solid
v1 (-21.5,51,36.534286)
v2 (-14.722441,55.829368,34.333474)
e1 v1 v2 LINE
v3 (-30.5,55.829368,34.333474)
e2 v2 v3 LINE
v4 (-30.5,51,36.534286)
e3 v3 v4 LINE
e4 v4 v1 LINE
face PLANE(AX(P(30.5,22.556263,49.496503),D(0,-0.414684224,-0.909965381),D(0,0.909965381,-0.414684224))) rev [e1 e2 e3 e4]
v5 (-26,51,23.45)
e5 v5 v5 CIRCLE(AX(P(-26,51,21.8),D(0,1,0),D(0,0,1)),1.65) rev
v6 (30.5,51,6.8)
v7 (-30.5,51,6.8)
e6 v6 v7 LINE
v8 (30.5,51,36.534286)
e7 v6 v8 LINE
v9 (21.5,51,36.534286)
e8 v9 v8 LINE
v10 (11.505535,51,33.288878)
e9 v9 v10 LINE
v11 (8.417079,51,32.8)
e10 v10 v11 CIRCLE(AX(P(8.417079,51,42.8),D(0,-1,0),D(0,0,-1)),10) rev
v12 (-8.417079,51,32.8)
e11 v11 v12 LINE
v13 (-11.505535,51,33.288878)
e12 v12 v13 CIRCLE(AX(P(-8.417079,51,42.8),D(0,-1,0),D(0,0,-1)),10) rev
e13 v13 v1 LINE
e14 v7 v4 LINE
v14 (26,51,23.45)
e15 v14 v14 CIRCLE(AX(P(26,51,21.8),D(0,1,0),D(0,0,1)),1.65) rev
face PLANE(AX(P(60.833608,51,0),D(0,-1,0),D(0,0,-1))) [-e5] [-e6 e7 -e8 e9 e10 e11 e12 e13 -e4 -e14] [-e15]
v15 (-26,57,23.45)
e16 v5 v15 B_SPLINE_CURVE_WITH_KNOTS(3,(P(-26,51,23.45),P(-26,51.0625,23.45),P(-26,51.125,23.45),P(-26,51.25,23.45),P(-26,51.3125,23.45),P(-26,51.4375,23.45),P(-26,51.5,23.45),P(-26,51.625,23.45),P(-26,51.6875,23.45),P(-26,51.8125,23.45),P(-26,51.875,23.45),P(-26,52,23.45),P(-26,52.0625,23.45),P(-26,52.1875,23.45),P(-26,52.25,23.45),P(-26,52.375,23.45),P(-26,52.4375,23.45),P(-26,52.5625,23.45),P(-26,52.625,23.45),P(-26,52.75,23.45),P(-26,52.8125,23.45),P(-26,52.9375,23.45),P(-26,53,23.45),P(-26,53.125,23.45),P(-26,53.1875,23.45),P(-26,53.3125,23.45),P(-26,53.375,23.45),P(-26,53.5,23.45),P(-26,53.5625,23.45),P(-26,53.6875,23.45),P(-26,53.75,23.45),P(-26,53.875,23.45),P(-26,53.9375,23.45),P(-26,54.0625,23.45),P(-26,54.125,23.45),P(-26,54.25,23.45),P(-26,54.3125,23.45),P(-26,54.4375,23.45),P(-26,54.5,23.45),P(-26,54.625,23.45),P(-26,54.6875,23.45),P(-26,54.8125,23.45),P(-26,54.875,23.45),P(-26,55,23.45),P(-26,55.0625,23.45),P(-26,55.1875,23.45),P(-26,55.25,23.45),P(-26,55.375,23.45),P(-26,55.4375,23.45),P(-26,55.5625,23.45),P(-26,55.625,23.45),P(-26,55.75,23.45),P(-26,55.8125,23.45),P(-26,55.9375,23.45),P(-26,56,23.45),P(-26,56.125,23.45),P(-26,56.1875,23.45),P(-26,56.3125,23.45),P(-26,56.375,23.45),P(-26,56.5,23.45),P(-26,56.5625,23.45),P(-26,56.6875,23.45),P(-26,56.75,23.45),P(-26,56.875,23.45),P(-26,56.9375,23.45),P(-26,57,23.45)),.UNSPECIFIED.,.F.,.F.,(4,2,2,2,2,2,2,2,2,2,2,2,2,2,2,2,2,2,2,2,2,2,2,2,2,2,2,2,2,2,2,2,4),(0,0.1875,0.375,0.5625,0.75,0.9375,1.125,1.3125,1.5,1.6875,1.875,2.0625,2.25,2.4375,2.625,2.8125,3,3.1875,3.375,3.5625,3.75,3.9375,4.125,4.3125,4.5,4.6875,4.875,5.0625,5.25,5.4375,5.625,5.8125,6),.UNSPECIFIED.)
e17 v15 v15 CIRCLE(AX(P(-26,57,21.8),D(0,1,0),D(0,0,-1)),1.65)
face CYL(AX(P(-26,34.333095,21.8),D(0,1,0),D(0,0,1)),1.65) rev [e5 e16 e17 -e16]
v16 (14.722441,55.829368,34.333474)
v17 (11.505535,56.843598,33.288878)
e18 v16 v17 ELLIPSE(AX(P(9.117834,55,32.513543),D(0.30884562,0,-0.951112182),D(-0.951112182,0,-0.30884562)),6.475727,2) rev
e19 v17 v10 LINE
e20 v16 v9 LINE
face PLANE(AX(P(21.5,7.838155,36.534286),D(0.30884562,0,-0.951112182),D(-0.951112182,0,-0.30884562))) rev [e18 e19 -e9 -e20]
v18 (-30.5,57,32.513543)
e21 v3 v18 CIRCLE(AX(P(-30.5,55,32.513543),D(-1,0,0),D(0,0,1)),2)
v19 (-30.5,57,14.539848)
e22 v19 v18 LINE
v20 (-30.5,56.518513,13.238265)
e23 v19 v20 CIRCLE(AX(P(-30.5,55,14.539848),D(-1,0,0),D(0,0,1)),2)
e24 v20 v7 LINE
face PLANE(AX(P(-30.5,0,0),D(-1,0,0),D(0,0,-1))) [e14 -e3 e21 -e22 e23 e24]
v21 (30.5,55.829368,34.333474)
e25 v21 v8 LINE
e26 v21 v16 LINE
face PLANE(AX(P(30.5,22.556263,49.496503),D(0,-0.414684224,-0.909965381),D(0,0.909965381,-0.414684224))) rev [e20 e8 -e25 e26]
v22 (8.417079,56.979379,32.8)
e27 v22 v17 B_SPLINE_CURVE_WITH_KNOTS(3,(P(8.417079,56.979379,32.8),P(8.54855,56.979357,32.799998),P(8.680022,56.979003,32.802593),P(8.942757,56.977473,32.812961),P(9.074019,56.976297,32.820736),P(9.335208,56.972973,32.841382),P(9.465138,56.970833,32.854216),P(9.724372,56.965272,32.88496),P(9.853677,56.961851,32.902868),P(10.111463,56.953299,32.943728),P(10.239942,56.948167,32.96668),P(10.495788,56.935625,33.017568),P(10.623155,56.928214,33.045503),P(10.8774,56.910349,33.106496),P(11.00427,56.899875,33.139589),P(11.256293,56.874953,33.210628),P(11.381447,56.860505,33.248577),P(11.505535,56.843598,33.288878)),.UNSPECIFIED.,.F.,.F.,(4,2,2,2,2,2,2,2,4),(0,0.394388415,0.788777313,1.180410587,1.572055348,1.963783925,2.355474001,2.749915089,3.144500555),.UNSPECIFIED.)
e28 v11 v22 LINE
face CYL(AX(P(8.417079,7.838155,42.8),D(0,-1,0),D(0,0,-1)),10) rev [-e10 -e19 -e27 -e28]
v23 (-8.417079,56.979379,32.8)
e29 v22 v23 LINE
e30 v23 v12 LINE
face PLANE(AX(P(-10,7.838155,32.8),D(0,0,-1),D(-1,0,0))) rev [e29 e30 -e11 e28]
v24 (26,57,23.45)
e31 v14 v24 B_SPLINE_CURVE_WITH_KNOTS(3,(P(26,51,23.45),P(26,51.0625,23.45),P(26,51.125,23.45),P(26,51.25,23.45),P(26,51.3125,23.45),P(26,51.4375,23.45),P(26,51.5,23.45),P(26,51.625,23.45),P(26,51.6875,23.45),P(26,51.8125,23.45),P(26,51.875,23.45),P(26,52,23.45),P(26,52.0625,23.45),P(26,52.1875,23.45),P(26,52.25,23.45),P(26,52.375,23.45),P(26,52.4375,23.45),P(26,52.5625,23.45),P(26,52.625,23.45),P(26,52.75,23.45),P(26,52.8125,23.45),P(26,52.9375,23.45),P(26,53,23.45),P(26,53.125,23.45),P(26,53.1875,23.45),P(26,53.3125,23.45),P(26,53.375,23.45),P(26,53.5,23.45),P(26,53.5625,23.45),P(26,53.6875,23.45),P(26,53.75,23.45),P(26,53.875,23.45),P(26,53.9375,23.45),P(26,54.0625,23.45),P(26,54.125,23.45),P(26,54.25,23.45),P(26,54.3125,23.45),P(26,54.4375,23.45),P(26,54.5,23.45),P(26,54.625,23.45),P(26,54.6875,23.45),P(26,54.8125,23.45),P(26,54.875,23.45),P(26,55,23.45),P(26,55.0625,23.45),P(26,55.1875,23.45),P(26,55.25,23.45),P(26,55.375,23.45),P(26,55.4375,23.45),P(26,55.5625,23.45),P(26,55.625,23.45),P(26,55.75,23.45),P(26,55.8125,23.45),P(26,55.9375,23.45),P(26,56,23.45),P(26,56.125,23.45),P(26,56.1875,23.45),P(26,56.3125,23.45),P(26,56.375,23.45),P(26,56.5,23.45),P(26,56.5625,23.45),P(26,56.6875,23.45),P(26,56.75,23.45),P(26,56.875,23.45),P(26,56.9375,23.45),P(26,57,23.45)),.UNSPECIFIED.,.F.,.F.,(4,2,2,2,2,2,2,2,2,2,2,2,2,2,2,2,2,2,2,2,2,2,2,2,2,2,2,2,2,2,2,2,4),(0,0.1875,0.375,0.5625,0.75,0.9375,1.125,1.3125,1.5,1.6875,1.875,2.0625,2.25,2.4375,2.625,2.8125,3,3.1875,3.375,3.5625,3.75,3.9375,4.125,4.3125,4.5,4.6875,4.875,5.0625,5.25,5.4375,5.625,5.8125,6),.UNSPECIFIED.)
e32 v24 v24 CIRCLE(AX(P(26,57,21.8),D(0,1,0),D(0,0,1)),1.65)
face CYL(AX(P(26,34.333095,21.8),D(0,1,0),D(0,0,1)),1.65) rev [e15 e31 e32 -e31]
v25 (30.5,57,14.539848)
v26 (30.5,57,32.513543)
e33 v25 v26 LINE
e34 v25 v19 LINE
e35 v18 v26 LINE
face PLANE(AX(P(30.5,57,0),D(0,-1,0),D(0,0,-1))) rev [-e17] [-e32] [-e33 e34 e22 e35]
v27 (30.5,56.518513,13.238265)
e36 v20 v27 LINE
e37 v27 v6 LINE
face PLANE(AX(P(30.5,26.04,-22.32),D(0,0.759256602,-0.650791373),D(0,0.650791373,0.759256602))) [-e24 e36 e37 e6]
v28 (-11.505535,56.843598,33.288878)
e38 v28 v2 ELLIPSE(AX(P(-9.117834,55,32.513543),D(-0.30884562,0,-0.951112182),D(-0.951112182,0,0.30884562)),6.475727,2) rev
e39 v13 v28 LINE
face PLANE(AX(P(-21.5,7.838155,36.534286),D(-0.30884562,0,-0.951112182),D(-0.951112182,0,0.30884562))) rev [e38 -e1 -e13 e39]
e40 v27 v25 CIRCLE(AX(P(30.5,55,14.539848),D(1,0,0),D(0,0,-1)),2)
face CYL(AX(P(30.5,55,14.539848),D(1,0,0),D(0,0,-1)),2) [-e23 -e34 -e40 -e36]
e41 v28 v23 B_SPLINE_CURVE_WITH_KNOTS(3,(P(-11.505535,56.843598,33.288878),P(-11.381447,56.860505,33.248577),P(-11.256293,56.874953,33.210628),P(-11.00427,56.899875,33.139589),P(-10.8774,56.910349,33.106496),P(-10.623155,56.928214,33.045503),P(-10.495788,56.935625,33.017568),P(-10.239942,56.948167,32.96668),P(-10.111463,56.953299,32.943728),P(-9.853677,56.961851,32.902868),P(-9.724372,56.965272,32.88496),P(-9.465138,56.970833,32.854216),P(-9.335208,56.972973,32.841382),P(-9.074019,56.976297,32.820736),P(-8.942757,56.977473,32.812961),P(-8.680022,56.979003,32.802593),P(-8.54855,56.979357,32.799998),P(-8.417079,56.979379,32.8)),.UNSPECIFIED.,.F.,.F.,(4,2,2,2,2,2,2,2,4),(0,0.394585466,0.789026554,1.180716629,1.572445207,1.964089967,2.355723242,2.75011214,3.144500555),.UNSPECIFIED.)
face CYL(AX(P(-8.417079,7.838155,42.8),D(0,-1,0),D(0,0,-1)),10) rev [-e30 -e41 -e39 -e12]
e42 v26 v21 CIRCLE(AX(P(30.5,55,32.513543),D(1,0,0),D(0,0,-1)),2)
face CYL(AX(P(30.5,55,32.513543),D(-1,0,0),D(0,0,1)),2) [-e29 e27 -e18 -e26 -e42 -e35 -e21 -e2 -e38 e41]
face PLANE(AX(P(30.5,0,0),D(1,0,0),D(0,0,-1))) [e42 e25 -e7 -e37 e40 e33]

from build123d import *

# Parameters (mm, degrees)
SKETCH1_R                      = 10.999999999999991
SKETCH1_R_2                    = 1.5500000000000034
SKETCH1_R_3                    = 1.5500000000000018
SKETCH1_R_4                    = 1.5499999999999992
SKETCH1_R_5                    = 1.5500000000000012
BOSS_EXTRUDE1_DEPTH            = 2.8
SKETCH2_R                      = 1.5499999999999992
SKETCH2_R_2                    = 1.5500000000000005
SKETCH2_R_3                    = 1.5500000000000034
SKETCH2_R_4                    = 1.5500000000000018
BOSS_EXTRUDE2_DEPTH            = 8
SKETCH3_R                      = 2.75
SKETCH3_R_2                    = 2.749999999999998
SKETCH3_R_3                    = 2.7500000000000044
SKETCH3_R_4                    = 2.7500000000000036
CUT_EXTRUDE1_DEPTH             = 3.6
SKETCH4_W                      = 13.999999999999996
SKETCH4_H                      = 24
BOSS_EXTRUDE3_DEPTH            = 9
CUT_EXTRUDE3_DEPTH             = 92.05990830217213
CHAMFER1_SIZE                  = 2.4
BOSS_EXTRUDE4_START            = -21.5
BOSS_EXTRUDE4_DEPTH            = 43
SKETCH5_R                      = 1.6499999999999986
SKETCH5_R_2                    = 1.6500000000000061
CUT_EXTRUDE2_DEPTH             = 18
CUT_EXTRUDE4_DEPTH             = 2.8
CHAMFER2_SIZE                  = 1
CHAMFER3_SIZE                  = 1
FILLET1_R                      = 2
CHAMFER4_SIZE                  = 2
CHAMFER5_SIZE                  = 0.4
CHAMFER6_SIZE                  = 0.4
CUT_EXTRUDE6_REACH             = 93.06
CUT_EXTRUDE6_DIRECTION_2_DEPTH = 92.05990830217215
CUT_EXTRUDE5_DEPTH             = 92.05990830217213
CUT_EXTRUDE5_DEPTH_BACK        = 92.05990830217213
FILLET2_R                      = 10


# Read off the part's stored shape, not the designer's step: Mirror1
with BuildPart() as part:
    # Sketch1 → Boss-Extrude1 (new body)
    with BuildSketch(Plane.XY):
        Polygon((-21.499999999999996, 51), (21.499999999999996, 51), (21.5, 8), (-21.5, 8), align=None)
        with Locations((0, 29.5)):
            Circle(SKETCH1_R, mode=Mode.SUBTRACT)
        with Locations((-15.5, 45)):
            Circle(SKETCH1_R_2, mode=Mode.SUBTRACT)
        with Locations((15.5, 45)):
            Circle(SKETCH1_R_3, mode=Mode.SUBTRACT)
        with Locations((-15.5, 14.000000000000005)):
            Circle(SKETCH1_R_4, mode=Mode.SUBTRACT)
        with Locations((15.5, 14.000000000000005)):
            Circle(SKETCH1_R_5, mode=Mode.SUBTRACT)
    extrude(amount=BOSS_EXTRUDE1_DEPTH)

    # Sketch2 → Boss-Extrude2 (add)
    with BuildSketch(Plane(origin=(0, 0, 0), x_dir=(1, 0, 0), z_dir=(0, 1, 0))):
        with BuildLine():
            Line((-21.5, 0), (21.5, 0))
            Line((21.5, 0), (21.5, -56.13000000000001))
            Line((21.5, -56.13000000000001), (12.052422437019597, -62.83770289976113))
            ThreePointArc((12.052422437019597, -62.83770289976113), (10.126743955166411, -63.79910489864743), (8.000000000000245, -64.12999999999994))
            Line((8.000000000000245, -64.12999999999994), (-7.999999999999807, -64.13))
            ThreePointArc((-7.999999999999807, -64.13), (-10.126743955165974, -63.7991048986475), (-12.052422437019167, -62.83770289976122))
            Line((-12.052422437019167, -62.83770289976122), (-21.49999999999961, -56.13000000000015))
            Line((-21.49999999999961, -56.13000000000015), (-21.5, 0))
        make_face()
        with Locations(Location((8.00000000000003, -8.800000000000002, 0), (0, 0, 270))):
            Circle(SKETCH2_R, mode=Mode.SUBTRACT)
        with Locations(Location((-7.999999999999971, -8.800000000000054, 0), (0, 0, 270))):
            Circle(SKETCH2_R_2, mode=Mode.SUBTRACT)
        with Locations(Location((-7.999999999999804, -57.13000000000005, 0), (0, 0, 270))):
            Circle(SKETCH2_R_3, mode=Mode.SUBTRACT)
        with Locations(Location((8.000000000000195, -57.13, 0), (0, 0, 270))):
            Circle(SKETCH2_R_4, mode=Mode.SUBTRACT)
        with BuildLine():
            Line((15.912505911952584, -21.89324240011998), (3.312505911952694, -31.19069648889579))
            ThreePointArc((3.312505911952694, -31.19069648889579), (2.5001050442102857, -32.779502053609654), (3.2797696996303043, -34.38462551224556))
            Line((3.2797696996303043, -34.38462551224556), (15.87976969963019, -44.08717142346975))
            ThreePointArc((15.87976969963019, -44.08717142346975), (17.983045695097484, -44.297045925258715), (19.099999999999998, -42.50254591122421))
            Line((19.099999999999998, -42.50254591122421), (19.1, -23.50254591122421))
            ThreePointArc((19.1, -23.50254591122421), (18.001391098221283, -21.717190459767167), (15.912505911952584, -21.89324240011998))
        make_face(mode=Mode.SUBTRACT)
        with BuildLine():
            Line((10.520825659408167, -19.409303511104177), (1.1874940880475682, -26.2963052396794))
            ThreePointArc((1.1874940880475682, -26.2963052396794), (9.102e-14, -26.687001728575183), (-1.1874940880473879, -26.296305239679405))
            Line((-1.1874940880473879, -26.296305239679405), (-10.520825659408036, -19.40930351110425))
            ThreePointArc((-10.520825659408036, -19.40930351110425), (-11.233148275967746, -17.17494281149982), (-9.333331571360638, -15.800000000000061))
            Line((-9.333331571360638, -15.800000000000061), (9.333331571360745, -15.799999999999999))
            ThreePointArc((9.333331571360745, -15.799999999999999), (11.233148275967867, -17.17494281149974), (10.520825659408167, -19.409303511104177))
        make_face(mode=Mode.SUBTRACT)
        with BuildLine():
            Line((1.2202303003699406, -39.36175579272474), (10.553561871730695, -46.548825481280836))
            ThreePointArc((10.553561871730695, -46.548825481280836), (11.226642299225048, -48.77794652318848), (9.333331571360894, -50.13345099352635))
            Line((9.333331571360894, -50.13345099352635), (-9.33333157136048, -50.133450993526345))
            ThreePointArc((-9.33333157136048, -50.133450993526345), (-11.226642299224643, -48.7779465231885), (-10.553561871730299, -46.548825481280836))
            Line((-10.553561871730299, -46.548825481280836), (-1.2202303003696755, -39.36175579272474))
            ThreePointArc((-1.2202303003696755, -39.36175579272474), (1.3436e-13, -38.946381304970274), (1.2202303003699406, -39.36175579272474))
        make_face(mode=Mode.SUBTRACT)
        with BuildLine():
            Line((-3.2797696996300685, -34.384625512245584), (-15.879769699629884, -44.087171423469854))
            ThreePointArc((-15.879769699629884, -44.087171423469854), (-17.98304569509718, -44.297045925258836), (-19.099999999999707, -42.50254591122434))
            Line((-19.099999999999707, -42.50254591122434), (-19.099999999999834, -23.502545911224342))
            ThreePointArc((-19.099999999999834, -23.502545911224342), (-18.00139109822113, -21.71719045976729), (-15.912505911952431, -21.893242400120087))
            Line((-15.912505911952431, -21.893242400120087), (-3.31250591195248, -31.190696488895814))
            ThreePointArc((-3.31250591195248, -31.190696488895814), (-2.500105044210054, -32.779502053609676), (-3.2797696996300685, -34.384625512245584))
        make_face(mode=Mode.SUBTRACT)
    extrude(amount=BOSS_EXTRUDE2_DEPTH)

    # Sketch3 → Cut-Extrude1 (cut)
    with BuildSketch(Plane(origin=(0, 8, 0), x_dir=(1, 0, 0), z_dir=(0, 1, 0))):
        with Locations(Location((-7.999999999999971, -8.800000000000054, 0), (0, 0, 270))):
            Circle(SKETCH3_R)
        with Locations(Location((8.00000000000003, -8.800000000000002, 0), (0, 0, 270))):
            Circle(SKETCH3_R_2)
        with Locations(Location((-7.999999999999804, -57.13000000000005, 0), (0, 0, 270))):
            Circle(SKETCH3_R_3)
        with Locations(Location((8.000000000000195, -57.13, 0), (0, 0, 270))):
            Circle(SKETCH3_R_4)
    extrude(amount=-CUT_EXTRUDE1_DEPTH, mode=Mode.SUBTRACT)

    # Sketch4 → Boss-Extrude3 (add)
    # profile 1 of 2: a face of its own
    with BuildSketch(Plane(origin=(21.5, 1.73e-15, 0), x_dir=(0, 0, -1), z_dir=(1, 0, 0))):
        Polygon((-2.8, 8), (-2.8, 51), (-6.800000000000001, 51), (-13.799999999999999, 56.99999999999999), (-33.8, 57), (-56.13000000000001, 8.000000000000007), align=None)
        with Locations((-21.79999999999999, 26.999999999999993)):
            Rectangle(SKETCH4_W, SKETCH4_H, mode=Mode.SUBTRACT)
    # profile 2 of 2: a face of its own
    with BuildSketch(Plane(origin=(21.5, 1.73e-15, 0), x_dir=(0, 0, -1), z_dir=(1, 0, 0))):
        Polygon((0, 51), (-2.8, 51), (-2.8, 8), (-56.13000000000001, 8.000000000000007), (-56.13000000000001, 0), (0, 0), align=None)
    extrude(amount=BOSS_EXTRUDE3_DEPTH)

    # Sketch6 → Cut-Extrude3 (cut, through all)
    with BuildSketch(Plane.XZ):
        with BuildLine():
            Line((30.5, 56.13000000000001), (21.5, 56.13000000000001))
            Line((21.5, 56.13000000000001), (27.131339928022157, 52.13179464916522))
            ThreePointArc((27.131339928022157, 52.13179464916522), (29.60811928094123, 49.27948759313254), (30.5, 45.60870562086678))
            Line((30.5, 45.60870562086678), (30.5, 56.13000000000001))
        make_face()
    extrude(amount=-CUT_EXTRUDE3_DEPTH, mode=Mode.SUBTRACT)

    # Chamfer1
    # the kernel refuses this chamfer: 2.4 mm, written as the material it adds along each edge
    with BuildSketch(Plane(origin=(21.5, 8, 2.8), x_dir=(-0.9996219169112968, -0.027495876610586303, 0), z_dir=(0, 0, 1))) as chamfer1_piece_1_section:
        Polygon((CHAMFER1_SIZE * 0.999621916911, -CHAMFER1_SIZE * 0.0274958766106), (-CHAMFER1_SIZE * 0.0274958766106, -CHAMFER1_SIZE * 0.999621916911), (0, 0), align=None)
    chamfer1_piece_1 = extrude(amount=59.502039171118206, mode=Mode.PRIVATE)
    chamfer1_piece_1 = split(chamfer1_piece_1, bisect_by=Plane(origin=(20.6986233607906, 18.79069033848495, 51.212528260033295), z_dir=(0, -0.4146842236388121, -0.9099653810256058)), keep=Keep.TOP, mode=Mode.PRIVATE)
    add(chamfer1_piece_1)

    # Mirror1: part across plane


with BuildPart() as part_1:
    add(part.part)
    add(part.part.mirror(Plane(origin=(0, 0, 0), x_dir=(0, 0, 1), z_dir=(1, 0, 0))))

    # Sketch7 → Boss-Extrude4 (add)
    with BuildSketch(Plane(origin=(0, 0, 0), x_dir=(0, 0, -1), z_dir=(1, 0, 0)).offset(BOSS_EXTRUDE4_START)):
        Polygon((-36.53428571428571, 50.99999999999999), (-6.800000000000001, 51), (-13.799999999999999, 56.99999999999999), (-33.8, 57), align=None)
    extrude(amount=BOSS_EXTRUDE4_DEPTH)

    # Sketch5 → Cut-Extrude2 (cut)
    with BuildSketch(Plane(origin=(0, 56.999999999999986, -1.978e-14), x_dir=(1, 0, 0), z_dir=(0, 1, 0))):
        with Locations(Location((26, -21.8, 0), (0, 0, 270))):
            Circle(SKETCH5_R)
        with Locations(Location((-26, -21.8, 0), (0, 0, 270))):
            Circle(SKETCH5_R_2)
    extrude(amount=-CUT_EXTRUDE2_DEPTH, mode=Mode.SUBTRACT)

    # Sketch9 → Cut-Extrude4 (cut)
    with BuildSketch(Plane.XZ.offset(-38.99999999999999)):
        Polygon((26, 18.566838492538096), (28.800000000000004, 20.183419246269047), (28.800000000000008, 23.416580753730955), (26.00000000000001, 25.03316150746191), (23.200000000000003, 23.416580753730955), (23.2, 20.18341924626905), align=None)
        Polygon((-26, 18.566838492538096), (-28.800000000000004, 20.183419246269047), (-28.800000000000008, 23.416580753730955), (-26.00000000000001, 25.03316150746191), (-23.200000000000003, 23.416580753730955), (-23.2, 20.18341924626905), align=None)
    extrude(amount=-CUT_EXTRUDE4_DEPTH, mode=Mode.SUBTRACT)

    # Chamfer2
    chamfer2_edges = [part_1.edges().sort_by_distance(p)[0] for p in [
        (30.5, 1.73e-15, 22.804352810433386),
        (29.60811928094123, 0, 49.27948759313254),
        (-30.5, 1.73e-15, 22.804352810433386),
        (-29.60811928094123, 0, 49.27948759313254),
        (-10.12674395516598, 8, 63.7991048986475),
        (2.1849e-13, 0, 64.12999999999997),
        (10.126743955166415, 0, 63.79910489864743),
        (19.59188118252077, 0, 57.4847487744632),
        (-16.77621121850939, 8, 59.48385144988068),
        (-10.12674395516598, 0, 63.7991048986475),
        (-19.59188118252077, 0, 57.4847487744632),
        (2.1849e-13, 8, 64.12999999999997),
        (10.126743955166415, 8, 63.79910489864743),
        (16.7762112185098, 8, 59.483851449880575),
    ]]
    chamfer(chamfer2_edges, length=CHAMFER2_SIZE)

    # Chamfer3
    chamfer3_edges = [part_1.edges().sort_by_distance(p)[0] for p in [
        (30.5, 51, 3.4000000000000004),
        (-30.5, 51, 3.4000000000000004),
    ]]
    chamfer(chamfer3_edges, length=CHAMFER3_SIZE)

    # Fillet1
    fillet1_edges = [part_1.edges().sort_by_distance(p)[0] for p in [
        (0, 57, 33.8),
        (0, 56.99999999999999, 13.799999999999999),
    ]]
    fillet(fillet1_edges, radius=FILLET1_R)

    # Chamfer4
    chamfer4_edges = [part_1.edges().sort_by_distance(p)[0] for p in [
        (30.5, 26.999999999999993, 14.799999999999994),
        (30.5, 14.999999999999995, 21.799999999999994),
        (26, 14.999999999999995, 14.799999999999994),
        (30.5, 26.999999999999993, 28.799999999999994),
        (26, 14.999999999999995, 28.799999999999994),
        (21.5, 26.999999999999993, 28.799999999999994),
        (21.5, 14.999999999999995, 21.799999999999994),
        (21.5, 26.999999999999993, 14.799999999999994),
        (-21.5, 26.999999999999993, 28.799999999999994),
        (-21.5, 14.999999999999995, 21.799999999999994),
        (-26, 14.999999999999995, 28.799999999999994),
        (-21.5, 26.999999999999993, 14.799999999999994),
        (-26, 14.999999999999995, 14.799999999999994),
        (-30.5, 26.999999999999993, 28.799999999999994),
        (-30.5, 14.999999999999995, 21.799999999999994),
        (-30.5, 26.999999999999993, 14.799999999999994),
    ]]
    chamfer(chamfer4_edges, length=CHAMFER4_SIZE)

    # Chamfer5
    chamfer5_edges = [part_1.edges().sort_by_distance(p)[0] for p in [
        (-10.999999999999993, 29.500000000000007, 2.8),
    ]]
    chamfer(chamfer5_edges, length=CHAMFER5_SIZE)

    # Chamfer6
    chamfer6_edges = [part_1.edges().sort_by_distance(p)[0] for p in [
        (8.00000000000003, 8, 6.050000000000004),
        (-7.999999999999802, 8, 54.380000000000045),
        (8.000000000000195, 8, 54.379999999999995),
        (-7.999999999999969, 8, 6.050000000000054),
    ]]
    chamfer(chamfer6_edges, length=CHAMFER6_SIZE)

    # Cut-Extrude6: up to this face of the body (flat: up to its plane)
    cut_extrude6_end = Plane(part_1.part.faces().sort_by_distance((0, 51, 21.667142857))[0])
    # Sketch10 → Cut-Extrude6 (cut, up to the picked face)
    with BuildSketch(Plane(origin=(0, 56.999999999999986, -1.978e-14), x_dir=(1, 0, 0), z_dir=(0, 1, 0)), mode=Mode.PRIVATE) as cut_extrude6_sk1:
        Polygon((21.499999999999964, -36.53428571428573), (10, -32.79999999999994), (-10, -32.79999999999994), (-21.499999999999964, -36.53428571428573), align=None)
    cut_extrude6_tool1 = split(extrude(cut_extrude6_sk1.sketch, amount=-CUT_EXTRUDE6_REACH, mode=Mode.PRIVATE), bisect_by=cut_extrude6_end, keep=Keep.BOTH, mode=Mode.PRIVATE)
    add(cut_extrude6_tool1.solids().sort_by(Axis((0, 57, 34.894361), (0, -1, 0)))[0], mode=Mode.SUBTRACT)

    # Sketch10 → Cut-Extrude6 direction 2 (cut)
    with BuildSketch(Plane(origin=(0, 56.999999999999986, -1.978e-14), x_dir=(1, 0, 0), z_dir=(0, 1, 0))):
        Polygon((21.499999999999964, -36.53428571428573), (10, -32.79999999999994), (-10, -32.79999999999994), (-21.499999999999964, -36.53428571428573), align=None)
    extrude(amount=CUT_EXTRUDE6_DIRECTION_2_DEPTH, mode=Mode.SUBTRACT)

    # Sketch8 → Cut-Extrude5 (cut, two sides: drawn at the far end of the back side and taken through both)
    with BuildSketch(Plane(origin=(0, 0, 0), x_dir=(0, 0, -1), z_dir=(1, 0, 0)).offset(-CUT_EXTRUDE5_DEPTH_BACK)):
        Polygon((-6.800000000000001, 51), (-200, 50.99999999999998), (-200, 48.99999999999997), (-6.800000000000001, 48.99999999999999), align=None)
        Polygon((0, 51), (-6.800000000000001, 51), (-6.800000000000001, 48.99999999999999), (-200, 48.99999999999997), (-200, -2.449e-14), (0, 0), align=None)
    extrude(amount=CUT_EXTRUDE5_DEPTH + CUT_EXTRUDE5_DEPTH_BACK, mode=Mode.SUBTRACT)

    # Fillet2
    fillet2_edges = [part_1.edges().sort_by_distance(p)[0] for p in [
        (-10, 53.98968962932255, 32.79999999999992),
        (10, 53.98968962932255, 32.79999999999992),
    ]]
    fillet(fillet2_edges, radius=FILLET2_R)


solid = part_1.part
